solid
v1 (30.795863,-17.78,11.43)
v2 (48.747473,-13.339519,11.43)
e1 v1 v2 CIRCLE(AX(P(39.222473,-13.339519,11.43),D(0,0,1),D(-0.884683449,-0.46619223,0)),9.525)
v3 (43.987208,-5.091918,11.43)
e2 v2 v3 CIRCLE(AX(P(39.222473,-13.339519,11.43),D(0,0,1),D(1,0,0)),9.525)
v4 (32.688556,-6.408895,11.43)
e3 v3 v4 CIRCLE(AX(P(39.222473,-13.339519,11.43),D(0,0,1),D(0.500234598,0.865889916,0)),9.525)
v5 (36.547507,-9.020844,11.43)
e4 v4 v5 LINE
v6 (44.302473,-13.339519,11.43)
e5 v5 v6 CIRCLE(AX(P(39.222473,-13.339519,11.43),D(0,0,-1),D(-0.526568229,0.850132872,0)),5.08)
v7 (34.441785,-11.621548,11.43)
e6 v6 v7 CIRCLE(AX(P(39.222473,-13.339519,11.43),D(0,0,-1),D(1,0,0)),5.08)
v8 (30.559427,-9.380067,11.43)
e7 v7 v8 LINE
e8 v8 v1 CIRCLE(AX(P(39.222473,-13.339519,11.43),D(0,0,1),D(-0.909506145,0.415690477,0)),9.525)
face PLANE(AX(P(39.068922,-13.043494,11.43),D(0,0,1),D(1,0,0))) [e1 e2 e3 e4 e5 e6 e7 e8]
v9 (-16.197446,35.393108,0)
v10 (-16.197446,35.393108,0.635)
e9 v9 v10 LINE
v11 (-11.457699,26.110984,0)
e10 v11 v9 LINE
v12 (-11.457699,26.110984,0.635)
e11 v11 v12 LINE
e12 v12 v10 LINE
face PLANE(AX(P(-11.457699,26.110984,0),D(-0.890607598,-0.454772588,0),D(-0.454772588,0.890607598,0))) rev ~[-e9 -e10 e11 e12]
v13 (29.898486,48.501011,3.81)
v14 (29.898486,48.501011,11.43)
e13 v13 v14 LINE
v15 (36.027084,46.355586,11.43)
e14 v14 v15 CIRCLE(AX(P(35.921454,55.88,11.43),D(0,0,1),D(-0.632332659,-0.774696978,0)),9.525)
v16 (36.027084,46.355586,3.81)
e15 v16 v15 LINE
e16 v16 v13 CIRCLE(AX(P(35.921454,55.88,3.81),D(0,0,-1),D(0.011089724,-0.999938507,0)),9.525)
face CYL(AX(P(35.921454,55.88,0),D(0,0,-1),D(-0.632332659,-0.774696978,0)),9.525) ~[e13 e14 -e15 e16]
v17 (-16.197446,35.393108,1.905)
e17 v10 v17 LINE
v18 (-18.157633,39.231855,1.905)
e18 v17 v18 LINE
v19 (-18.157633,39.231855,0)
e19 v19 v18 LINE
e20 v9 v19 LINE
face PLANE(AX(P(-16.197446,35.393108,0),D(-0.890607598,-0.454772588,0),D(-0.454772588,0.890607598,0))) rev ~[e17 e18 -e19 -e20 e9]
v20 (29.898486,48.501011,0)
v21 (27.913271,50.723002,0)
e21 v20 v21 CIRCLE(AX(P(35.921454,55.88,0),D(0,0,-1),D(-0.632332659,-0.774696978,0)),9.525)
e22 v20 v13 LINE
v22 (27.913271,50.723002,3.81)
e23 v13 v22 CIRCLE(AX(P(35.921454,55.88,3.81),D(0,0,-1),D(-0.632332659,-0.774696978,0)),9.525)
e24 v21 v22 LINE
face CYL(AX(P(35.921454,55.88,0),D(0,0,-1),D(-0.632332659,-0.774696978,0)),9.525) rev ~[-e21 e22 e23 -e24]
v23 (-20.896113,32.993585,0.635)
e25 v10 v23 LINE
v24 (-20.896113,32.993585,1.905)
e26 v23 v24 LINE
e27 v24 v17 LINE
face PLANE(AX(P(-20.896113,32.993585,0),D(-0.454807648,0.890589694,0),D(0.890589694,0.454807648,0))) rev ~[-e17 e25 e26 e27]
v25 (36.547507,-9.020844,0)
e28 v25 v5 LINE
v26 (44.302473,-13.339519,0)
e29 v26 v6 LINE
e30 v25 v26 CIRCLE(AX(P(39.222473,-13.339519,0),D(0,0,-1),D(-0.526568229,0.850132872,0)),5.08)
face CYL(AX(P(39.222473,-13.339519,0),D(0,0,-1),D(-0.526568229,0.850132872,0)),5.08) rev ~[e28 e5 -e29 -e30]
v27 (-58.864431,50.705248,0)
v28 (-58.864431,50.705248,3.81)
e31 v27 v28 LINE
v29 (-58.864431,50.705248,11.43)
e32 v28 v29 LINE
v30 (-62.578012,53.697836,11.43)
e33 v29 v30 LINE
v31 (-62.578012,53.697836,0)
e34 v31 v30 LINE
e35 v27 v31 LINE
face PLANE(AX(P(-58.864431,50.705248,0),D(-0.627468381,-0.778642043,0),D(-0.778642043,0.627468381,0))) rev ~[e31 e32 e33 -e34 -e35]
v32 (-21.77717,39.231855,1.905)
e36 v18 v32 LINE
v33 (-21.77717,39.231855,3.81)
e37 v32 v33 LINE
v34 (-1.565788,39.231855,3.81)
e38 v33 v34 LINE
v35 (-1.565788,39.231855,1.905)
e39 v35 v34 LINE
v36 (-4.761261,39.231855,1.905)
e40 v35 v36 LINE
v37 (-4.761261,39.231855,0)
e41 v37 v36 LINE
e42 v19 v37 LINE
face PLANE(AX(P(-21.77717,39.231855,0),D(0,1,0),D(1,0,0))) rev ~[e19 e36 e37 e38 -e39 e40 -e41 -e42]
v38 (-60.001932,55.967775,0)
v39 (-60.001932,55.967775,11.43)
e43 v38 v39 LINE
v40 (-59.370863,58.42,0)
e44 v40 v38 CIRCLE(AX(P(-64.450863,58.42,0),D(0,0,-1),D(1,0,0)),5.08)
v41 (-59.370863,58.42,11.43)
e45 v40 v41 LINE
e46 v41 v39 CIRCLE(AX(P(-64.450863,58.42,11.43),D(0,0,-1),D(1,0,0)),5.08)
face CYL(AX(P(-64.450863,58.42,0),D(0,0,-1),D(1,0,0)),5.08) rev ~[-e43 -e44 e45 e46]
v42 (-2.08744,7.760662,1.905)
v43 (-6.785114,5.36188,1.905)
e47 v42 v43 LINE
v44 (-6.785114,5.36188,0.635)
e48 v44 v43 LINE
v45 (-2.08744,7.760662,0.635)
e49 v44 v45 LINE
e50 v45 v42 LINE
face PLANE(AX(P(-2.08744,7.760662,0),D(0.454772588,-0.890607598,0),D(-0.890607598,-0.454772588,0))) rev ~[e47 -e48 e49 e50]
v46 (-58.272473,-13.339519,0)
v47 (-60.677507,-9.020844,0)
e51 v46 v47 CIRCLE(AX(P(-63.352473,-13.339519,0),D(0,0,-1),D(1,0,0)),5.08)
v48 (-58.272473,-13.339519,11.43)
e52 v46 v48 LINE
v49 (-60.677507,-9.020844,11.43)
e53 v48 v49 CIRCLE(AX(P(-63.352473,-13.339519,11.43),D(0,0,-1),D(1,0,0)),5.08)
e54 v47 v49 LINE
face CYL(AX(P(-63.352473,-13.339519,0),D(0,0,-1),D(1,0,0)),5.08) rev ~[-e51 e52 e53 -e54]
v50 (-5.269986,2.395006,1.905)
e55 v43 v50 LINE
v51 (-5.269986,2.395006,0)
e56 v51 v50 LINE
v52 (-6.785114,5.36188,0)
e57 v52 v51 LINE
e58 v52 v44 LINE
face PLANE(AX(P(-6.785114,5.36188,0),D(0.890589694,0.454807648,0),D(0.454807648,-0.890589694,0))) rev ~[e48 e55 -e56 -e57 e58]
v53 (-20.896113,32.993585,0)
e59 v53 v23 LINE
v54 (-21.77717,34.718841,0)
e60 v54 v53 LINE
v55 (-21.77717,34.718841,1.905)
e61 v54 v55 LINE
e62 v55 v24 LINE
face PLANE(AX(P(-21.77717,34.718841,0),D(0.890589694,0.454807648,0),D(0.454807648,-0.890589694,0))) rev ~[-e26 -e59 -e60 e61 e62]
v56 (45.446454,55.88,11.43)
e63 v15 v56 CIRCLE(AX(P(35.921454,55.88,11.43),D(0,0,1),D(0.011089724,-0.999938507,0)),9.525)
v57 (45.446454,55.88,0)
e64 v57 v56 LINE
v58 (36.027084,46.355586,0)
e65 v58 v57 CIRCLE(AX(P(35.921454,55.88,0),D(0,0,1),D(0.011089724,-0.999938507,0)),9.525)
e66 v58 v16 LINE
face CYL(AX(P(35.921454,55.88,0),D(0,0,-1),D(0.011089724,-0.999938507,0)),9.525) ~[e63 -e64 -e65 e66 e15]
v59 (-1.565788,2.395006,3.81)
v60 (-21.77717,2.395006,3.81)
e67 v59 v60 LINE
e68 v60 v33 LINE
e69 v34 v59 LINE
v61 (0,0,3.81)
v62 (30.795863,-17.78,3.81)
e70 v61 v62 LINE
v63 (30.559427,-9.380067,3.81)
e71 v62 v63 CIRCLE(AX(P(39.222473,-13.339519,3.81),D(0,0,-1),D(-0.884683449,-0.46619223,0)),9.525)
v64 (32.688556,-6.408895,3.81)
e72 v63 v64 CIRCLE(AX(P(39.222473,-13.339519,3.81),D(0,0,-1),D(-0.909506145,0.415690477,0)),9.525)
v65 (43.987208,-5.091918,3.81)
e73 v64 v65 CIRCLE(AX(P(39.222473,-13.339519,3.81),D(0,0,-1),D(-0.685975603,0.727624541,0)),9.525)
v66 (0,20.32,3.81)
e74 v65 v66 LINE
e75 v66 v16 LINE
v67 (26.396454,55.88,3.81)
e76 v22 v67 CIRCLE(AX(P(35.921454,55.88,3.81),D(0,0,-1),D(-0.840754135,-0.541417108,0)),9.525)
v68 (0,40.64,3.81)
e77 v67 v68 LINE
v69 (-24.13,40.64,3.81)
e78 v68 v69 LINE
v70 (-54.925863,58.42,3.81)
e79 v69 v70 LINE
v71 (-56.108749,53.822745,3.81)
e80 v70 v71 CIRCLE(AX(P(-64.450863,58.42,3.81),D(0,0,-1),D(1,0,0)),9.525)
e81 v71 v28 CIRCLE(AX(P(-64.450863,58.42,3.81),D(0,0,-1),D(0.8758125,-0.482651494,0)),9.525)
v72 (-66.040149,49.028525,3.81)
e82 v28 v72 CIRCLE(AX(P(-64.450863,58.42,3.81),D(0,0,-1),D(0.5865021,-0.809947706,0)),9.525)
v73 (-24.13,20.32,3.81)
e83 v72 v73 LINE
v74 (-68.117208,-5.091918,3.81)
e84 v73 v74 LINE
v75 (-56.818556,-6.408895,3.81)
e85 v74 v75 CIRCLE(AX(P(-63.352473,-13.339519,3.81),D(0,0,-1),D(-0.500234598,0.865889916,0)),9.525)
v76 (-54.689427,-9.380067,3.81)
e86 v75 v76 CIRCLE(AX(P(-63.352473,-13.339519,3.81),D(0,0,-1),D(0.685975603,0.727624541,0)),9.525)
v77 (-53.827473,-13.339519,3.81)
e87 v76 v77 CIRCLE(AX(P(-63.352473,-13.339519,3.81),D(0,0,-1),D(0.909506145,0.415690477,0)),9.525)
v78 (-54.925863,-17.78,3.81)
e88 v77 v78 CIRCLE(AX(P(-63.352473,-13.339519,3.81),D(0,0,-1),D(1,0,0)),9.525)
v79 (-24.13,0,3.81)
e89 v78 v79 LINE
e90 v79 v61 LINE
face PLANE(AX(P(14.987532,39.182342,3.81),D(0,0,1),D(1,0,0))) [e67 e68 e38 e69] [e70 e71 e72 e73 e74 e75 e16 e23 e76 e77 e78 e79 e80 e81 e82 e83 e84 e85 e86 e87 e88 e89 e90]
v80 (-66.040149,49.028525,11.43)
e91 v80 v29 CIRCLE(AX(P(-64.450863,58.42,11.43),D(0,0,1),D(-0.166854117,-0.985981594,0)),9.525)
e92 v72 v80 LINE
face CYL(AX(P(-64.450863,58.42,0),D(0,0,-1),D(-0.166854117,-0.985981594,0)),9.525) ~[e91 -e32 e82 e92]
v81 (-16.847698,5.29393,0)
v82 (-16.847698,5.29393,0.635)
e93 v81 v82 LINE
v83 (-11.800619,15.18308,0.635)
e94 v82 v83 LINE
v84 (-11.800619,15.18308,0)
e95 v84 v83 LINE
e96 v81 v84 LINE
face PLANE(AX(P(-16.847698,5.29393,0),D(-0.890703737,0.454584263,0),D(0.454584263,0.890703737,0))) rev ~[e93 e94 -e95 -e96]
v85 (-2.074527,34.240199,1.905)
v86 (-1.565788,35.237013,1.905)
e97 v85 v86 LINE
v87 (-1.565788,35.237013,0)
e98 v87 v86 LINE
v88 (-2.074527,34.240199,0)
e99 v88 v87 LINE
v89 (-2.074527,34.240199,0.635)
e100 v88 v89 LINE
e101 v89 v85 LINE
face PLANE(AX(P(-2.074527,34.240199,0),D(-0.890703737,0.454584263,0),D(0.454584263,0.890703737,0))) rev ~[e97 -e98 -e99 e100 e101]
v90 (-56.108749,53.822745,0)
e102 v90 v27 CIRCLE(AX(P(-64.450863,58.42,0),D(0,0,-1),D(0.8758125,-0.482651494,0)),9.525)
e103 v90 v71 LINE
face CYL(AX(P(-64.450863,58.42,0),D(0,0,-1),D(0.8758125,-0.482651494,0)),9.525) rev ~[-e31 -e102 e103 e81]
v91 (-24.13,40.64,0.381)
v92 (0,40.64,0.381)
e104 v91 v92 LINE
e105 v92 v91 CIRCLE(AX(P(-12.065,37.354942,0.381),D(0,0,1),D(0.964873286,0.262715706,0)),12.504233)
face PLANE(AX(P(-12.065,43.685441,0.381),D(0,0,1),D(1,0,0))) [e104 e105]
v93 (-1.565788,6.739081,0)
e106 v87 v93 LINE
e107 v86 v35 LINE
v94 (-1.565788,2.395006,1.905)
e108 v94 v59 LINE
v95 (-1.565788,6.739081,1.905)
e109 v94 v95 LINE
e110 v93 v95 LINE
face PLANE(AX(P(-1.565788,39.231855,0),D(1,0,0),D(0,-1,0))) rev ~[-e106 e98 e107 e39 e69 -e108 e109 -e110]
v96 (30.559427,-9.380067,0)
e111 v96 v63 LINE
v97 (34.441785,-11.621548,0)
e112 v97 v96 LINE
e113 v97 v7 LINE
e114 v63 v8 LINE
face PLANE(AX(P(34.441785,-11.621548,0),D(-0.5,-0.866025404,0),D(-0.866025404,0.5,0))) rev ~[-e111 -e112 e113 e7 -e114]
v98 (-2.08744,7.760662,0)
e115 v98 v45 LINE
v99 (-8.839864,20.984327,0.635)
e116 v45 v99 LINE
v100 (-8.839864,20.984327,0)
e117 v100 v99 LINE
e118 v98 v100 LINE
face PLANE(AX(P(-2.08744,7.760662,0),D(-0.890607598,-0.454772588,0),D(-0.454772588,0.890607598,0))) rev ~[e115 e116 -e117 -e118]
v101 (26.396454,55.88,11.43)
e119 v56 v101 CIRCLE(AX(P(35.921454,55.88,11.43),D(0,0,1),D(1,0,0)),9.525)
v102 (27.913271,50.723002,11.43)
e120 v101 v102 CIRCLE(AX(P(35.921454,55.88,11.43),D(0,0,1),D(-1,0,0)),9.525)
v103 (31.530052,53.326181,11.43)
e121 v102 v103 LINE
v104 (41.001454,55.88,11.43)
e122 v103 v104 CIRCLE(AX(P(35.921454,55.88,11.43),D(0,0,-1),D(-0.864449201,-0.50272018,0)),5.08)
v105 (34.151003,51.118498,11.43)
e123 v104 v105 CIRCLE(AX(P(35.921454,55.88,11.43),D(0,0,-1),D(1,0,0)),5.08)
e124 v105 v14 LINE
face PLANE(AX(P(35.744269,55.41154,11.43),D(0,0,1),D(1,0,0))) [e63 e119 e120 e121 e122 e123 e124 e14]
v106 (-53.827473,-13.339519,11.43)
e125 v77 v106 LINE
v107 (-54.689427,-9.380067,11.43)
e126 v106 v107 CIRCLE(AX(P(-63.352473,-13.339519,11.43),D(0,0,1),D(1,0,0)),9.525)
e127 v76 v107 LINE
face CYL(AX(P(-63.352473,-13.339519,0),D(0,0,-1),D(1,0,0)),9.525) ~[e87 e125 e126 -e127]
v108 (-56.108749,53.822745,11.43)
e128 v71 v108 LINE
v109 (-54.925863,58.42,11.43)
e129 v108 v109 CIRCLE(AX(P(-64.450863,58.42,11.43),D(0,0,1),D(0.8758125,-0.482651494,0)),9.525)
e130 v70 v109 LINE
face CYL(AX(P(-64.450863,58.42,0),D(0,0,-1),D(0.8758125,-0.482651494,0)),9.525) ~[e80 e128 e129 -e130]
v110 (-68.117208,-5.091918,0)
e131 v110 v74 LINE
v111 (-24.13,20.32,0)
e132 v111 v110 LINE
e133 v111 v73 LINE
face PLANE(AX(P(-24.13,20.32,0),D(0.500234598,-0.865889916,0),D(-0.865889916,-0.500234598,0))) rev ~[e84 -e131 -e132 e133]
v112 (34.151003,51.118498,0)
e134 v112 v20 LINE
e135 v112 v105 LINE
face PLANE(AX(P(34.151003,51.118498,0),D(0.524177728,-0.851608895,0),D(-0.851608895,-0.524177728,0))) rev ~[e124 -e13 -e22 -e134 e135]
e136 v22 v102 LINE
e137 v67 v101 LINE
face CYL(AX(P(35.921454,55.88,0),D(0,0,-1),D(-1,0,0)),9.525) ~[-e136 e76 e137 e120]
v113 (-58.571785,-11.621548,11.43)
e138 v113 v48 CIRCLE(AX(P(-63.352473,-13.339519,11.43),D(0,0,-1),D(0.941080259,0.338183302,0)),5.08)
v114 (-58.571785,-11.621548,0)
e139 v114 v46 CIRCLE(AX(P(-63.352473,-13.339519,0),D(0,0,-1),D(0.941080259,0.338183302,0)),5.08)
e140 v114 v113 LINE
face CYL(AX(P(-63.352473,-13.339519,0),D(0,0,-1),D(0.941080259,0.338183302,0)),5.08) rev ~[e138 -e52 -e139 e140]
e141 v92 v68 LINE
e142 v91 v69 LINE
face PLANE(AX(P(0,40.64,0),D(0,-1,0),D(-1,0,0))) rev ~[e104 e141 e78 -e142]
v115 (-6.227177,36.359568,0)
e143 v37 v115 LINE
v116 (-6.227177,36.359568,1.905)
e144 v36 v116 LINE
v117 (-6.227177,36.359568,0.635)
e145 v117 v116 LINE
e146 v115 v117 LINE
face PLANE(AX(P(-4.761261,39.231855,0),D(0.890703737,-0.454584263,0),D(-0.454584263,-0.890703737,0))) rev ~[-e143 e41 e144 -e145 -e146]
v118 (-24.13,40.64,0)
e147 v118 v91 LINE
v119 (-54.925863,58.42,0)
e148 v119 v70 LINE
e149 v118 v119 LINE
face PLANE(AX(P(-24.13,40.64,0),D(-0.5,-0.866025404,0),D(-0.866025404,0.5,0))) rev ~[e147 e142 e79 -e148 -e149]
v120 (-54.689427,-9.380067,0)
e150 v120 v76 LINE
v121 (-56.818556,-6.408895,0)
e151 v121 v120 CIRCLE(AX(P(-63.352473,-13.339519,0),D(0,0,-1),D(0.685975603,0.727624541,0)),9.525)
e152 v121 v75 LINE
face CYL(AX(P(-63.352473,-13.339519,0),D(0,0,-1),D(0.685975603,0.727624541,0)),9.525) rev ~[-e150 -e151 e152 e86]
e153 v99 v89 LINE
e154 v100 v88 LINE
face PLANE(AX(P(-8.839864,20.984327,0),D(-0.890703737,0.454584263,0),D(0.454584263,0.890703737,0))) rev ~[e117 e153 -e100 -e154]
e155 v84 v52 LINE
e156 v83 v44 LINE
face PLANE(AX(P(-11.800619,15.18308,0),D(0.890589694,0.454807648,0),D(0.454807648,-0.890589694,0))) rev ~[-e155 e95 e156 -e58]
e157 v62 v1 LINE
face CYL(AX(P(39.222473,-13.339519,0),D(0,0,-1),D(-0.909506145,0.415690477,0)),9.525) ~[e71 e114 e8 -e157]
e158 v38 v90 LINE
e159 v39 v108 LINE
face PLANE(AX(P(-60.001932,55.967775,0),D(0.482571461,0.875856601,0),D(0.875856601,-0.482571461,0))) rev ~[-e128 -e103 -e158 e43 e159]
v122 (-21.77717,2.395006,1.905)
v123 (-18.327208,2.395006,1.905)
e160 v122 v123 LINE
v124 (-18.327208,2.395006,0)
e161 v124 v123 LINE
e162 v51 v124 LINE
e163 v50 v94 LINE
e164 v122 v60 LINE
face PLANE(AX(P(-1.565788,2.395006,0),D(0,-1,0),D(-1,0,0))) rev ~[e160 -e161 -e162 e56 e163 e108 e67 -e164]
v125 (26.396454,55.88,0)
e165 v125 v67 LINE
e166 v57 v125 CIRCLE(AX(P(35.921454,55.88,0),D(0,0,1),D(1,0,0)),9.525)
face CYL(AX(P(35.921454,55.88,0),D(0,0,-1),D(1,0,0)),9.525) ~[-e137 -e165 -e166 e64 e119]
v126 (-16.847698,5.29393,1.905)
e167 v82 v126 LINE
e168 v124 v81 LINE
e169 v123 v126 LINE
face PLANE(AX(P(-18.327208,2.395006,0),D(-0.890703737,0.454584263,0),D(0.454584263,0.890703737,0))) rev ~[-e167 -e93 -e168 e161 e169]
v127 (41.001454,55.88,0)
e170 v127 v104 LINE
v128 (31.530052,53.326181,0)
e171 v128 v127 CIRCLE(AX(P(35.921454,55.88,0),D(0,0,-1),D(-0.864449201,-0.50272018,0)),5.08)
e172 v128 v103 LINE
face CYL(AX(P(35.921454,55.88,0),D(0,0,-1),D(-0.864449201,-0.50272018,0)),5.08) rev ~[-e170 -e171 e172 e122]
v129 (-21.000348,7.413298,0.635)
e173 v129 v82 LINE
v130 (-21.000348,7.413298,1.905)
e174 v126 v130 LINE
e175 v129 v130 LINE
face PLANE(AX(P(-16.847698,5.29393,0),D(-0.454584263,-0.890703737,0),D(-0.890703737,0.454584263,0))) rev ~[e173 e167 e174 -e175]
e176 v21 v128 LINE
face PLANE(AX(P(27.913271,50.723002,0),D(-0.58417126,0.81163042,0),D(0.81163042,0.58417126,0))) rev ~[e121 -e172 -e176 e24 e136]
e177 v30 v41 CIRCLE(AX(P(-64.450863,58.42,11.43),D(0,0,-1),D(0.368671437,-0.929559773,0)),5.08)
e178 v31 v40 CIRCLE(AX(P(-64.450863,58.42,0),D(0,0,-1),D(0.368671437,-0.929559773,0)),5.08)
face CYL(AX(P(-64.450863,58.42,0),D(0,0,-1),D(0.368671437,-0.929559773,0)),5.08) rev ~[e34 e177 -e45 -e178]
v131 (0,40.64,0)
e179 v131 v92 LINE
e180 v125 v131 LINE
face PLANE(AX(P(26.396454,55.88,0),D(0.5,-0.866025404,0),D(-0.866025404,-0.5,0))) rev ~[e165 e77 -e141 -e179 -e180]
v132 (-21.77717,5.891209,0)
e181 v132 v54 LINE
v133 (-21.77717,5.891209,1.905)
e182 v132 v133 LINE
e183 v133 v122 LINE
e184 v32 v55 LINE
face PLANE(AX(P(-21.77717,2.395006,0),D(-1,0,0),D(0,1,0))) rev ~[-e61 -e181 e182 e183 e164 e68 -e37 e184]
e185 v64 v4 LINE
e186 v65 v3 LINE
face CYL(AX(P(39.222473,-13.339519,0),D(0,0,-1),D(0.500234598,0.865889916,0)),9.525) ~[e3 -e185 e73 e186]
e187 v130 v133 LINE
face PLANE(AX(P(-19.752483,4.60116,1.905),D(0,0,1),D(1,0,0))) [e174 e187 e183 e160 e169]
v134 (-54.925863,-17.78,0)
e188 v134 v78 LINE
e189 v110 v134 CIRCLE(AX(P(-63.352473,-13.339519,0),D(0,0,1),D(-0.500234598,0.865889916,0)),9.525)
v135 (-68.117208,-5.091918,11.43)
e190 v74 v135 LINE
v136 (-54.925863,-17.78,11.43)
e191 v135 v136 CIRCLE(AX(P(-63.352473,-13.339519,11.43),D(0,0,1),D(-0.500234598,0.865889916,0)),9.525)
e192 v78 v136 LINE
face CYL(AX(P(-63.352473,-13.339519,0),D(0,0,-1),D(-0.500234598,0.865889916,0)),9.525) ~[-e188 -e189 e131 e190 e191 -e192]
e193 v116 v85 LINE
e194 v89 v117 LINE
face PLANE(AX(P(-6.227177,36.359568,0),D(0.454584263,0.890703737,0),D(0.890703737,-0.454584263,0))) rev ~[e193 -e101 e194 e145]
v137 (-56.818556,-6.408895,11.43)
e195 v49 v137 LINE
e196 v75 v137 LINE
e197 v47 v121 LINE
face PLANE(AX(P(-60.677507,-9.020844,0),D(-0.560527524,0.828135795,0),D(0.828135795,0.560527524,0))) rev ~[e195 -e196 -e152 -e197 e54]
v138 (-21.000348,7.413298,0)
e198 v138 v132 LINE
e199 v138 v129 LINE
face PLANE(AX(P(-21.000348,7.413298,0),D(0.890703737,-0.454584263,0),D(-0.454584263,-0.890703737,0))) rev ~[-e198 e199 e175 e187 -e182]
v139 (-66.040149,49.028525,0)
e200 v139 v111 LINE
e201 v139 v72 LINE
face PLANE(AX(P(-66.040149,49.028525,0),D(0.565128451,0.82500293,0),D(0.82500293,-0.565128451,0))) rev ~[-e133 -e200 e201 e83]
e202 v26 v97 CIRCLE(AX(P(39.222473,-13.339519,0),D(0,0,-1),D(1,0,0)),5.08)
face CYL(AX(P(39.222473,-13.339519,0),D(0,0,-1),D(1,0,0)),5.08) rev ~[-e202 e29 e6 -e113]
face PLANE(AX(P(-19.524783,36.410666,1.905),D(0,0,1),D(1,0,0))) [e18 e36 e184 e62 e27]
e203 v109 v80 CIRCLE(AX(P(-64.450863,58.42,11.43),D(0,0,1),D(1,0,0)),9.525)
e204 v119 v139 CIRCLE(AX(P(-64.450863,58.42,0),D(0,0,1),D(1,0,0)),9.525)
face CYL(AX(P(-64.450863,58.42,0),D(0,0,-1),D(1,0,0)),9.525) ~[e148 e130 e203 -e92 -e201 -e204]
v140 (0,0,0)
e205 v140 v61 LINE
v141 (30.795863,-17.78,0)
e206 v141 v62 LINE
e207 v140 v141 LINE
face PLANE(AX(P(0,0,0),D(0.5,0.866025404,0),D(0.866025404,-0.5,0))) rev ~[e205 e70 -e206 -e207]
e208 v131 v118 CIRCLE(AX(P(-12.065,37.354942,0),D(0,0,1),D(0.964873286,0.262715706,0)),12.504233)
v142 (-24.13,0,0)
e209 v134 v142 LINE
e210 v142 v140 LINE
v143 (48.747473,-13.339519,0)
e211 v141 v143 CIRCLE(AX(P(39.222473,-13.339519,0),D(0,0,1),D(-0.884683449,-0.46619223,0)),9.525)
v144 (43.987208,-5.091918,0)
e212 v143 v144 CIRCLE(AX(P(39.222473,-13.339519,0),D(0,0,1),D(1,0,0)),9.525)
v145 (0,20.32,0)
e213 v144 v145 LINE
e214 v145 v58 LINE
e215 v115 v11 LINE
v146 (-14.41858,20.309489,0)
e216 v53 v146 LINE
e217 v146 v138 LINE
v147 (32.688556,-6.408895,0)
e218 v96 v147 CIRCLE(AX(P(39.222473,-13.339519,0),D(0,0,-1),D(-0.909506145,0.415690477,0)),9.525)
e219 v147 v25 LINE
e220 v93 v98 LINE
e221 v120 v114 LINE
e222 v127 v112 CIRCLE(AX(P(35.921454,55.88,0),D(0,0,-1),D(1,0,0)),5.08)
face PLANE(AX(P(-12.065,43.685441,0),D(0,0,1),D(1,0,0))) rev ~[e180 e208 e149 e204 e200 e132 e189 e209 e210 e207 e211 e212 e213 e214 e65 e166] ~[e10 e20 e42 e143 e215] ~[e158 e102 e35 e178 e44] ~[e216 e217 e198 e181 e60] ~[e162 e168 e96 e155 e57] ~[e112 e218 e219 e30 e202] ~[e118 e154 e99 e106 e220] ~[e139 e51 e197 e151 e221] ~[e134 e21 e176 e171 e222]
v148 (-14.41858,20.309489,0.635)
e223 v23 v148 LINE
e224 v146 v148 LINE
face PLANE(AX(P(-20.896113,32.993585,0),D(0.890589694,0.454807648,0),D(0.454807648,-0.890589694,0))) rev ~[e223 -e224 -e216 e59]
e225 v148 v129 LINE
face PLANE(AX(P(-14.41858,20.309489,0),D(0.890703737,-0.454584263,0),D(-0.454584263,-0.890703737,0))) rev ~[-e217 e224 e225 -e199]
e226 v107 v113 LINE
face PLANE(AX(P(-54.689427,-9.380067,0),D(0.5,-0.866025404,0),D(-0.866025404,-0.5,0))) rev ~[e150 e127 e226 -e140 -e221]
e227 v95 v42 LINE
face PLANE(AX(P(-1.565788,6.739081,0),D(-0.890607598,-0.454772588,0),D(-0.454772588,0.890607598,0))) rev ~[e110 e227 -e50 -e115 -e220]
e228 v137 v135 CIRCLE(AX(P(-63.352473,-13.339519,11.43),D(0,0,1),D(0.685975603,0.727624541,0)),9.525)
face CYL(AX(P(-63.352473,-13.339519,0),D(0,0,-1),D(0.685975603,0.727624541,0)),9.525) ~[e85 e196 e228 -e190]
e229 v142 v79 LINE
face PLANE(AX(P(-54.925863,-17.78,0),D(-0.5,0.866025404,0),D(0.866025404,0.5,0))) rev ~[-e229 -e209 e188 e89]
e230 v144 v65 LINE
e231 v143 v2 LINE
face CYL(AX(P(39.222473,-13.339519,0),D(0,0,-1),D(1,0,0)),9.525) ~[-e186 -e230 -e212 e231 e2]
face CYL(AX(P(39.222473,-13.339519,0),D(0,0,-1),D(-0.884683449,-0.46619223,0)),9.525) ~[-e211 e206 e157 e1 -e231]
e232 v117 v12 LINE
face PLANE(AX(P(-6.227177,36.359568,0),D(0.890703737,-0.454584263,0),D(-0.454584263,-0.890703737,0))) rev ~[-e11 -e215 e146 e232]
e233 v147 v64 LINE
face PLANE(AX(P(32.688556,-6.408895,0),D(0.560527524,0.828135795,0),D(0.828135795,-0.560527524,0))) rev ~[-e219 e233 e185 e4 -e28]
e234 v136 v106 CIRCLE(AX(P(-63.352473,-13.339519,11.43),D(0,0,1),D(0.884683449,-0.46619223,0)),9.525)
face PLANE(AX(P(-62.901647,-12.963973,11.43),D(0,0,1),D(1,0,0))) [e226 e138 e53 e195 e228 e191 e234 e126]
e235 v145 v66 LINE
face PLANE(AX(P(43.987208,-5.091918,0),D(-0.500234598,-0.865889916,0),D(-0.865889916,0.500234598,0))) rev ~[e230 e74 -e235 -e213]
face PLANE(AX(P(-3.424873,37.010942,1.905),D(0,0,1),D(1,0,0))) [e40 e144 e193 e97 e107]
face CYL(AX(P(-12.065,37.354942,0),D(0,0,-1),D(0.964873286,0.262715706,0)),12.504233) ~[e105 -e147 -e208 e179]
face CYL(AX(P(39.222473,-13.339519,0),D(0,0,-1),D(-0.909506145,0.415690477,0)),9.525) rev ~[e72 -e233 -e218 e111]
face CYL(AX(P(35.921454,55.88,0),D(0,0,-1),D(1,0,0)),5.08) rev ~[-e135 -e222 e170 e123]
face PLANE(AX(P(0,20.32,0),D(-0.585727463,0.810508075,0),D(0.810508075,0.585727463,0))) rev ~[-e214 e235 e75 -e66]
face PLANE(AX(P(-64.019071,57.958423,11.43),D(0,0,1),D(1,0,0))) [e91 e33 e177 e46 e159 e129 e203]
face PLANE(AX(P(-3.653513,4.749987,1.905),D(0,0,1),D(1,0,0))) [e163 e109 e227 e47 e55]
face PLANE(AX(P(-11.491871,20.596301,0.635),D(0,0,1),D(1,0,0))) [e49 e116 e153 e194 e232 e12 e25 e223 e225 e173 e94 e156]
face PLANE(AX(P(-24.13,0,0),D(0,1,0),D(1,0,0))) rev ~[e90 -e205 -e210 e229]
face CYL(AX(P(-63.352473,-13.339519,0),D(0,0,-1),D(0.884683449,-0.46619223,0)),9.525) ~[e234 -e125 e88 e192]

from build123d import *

# Parameters (mm, degrees)
F1_DEPTH = 3.81
F2_DEPTH = 11.43
F3_DEPTH = 1.905
F4_DEPTH = 0.635
F5_DEPTH = 0.381


with BuildPart() as f1:
    # F0 (on Top) → F1 (new body)
    with BuildSketch(Plane.XY):
        with BuildLine():
            Line((0, 40.64), (0, 20.32))
            Line((0, 20.32), (36.0270839263, 46.3555857197))
            ThreePointArc((36.0270839263, 46.3555857197), (32.7743226286, 46.8899395332), (29.8984857282, 48.5010112824))
            ThreePointArc((29.8984857282, 48.5010112824), (28.8184538619, 49.5338980727), (27.9132711745, 50.7230020447))
            ThreePointArc((27.9132711745, 50.7230020447), (26.7835232138, 53.1922797151), (26.3964543073, 55.88))
            Line((26.3964543073, 55.88), (0, 40.64))
        make_face()
        with BuildLine():
            Line((0, 20.32), (0, 0))
            Line((0, 0), (30.7958633586, -17.78))
            ThreePointArc((30.7958633586, -17.78), (29.7012441826, -13.6075167511), (30.5594271825, -9.3800672195))
            ThreePointArc((30.5594271825, -9.3800672195), (31.4801291394, -7.7913902048), (32.6885555919, -6.4088952646))
            ThreePointArc((32.6885555919, -6.4088952646), (38.1196995449, -3.8785721663), (43.9872077535, -5.0919175595))
            Line((43.9872077535, -5.0919175595), (0, 20.32))
        make_face()
        with BuildLine():
            Line((-54.9258633586, -17.78), (-24.13, 0))
            Line((-24.13, 0), (-24.13, 20.32))
            Line((-24.13, 20.32), (-68.1172077535, -5.0919175595))
            ThreePointArc((-68.1172077535, -5.0919175595), (-62.2496995449, -3.8785721663), (-56.8185555919, -6.4088952646))
            ThreePointArc((-56.8185555919, -6.4088952646), (-55.6101291394, -7.7913902048), (-54.6894271825, -9.3800672195))
            ThreePointArc((-54.6894271825, -9.3800672195), (-54.0454560084, -11.3134252867), (-53.8274732111, -13.3395190133))
            ThreePointArc((-53.8274732111, -13.3395190133), (-54.1061473504, -15.6266751246), (-54.9258633586, -17.78))
        make_face()
        with BuildLine():
            Line((-66.0401488201, 49.028525317), (-24.13, 20.32))
            Line((-24.13, 20.32), (-24.13, 40.64))
            Line((-24.13, 40.64), (-54.9258633586, 58.42))
            ThreePointArc((-54.9258633586, 58.42), (-55.2263237646, 56.0465016792), (-56.1087492964, 53.8227445173))
            ThreePointArc((-56.1087492964, 53.8227445173), (-57.3142816625, 52.1116859071), (-58.8644308605, 50.7052480957))
            ThreePointArc((-58.8644308605, 50.7052480957), (-62.2835733625, 49.1448461429), (-66.0401488201, 49.028525317))
        make_face()
        Polygon((-24.13, 0), (0, 0), (0, 20.32), (0, 40.64), (-24.13, 40.64), (-24.13, 20.32), align=None)
        Polygon((-18.3272082359, 2.3950056639), (-21.7771697789, 2.3950056639), (-21.7771697789, 5.8912090026), (-21.7771697789, 34.7188413143), (-21.7771697789, 39.2318554223), (-18.1576330215, 39.2318554223), (-4.7612613998, 39.2318554223), (-1.5657880576, 39.2318554223), (-1.5657880576, 35.2370127553), (-1.5657880576, 6.7390808836), (-1.5657880576, 2.3950056639), (-5.2699861117, 2.3950056639), align=None, mode=Mode.SUBTRACT)
    extrude(amount=F1_DEPTH)

    # F0 (on Top) → F2 (join)
    with BuildSketch(Plane.XY):
        with BuildLine():
            ThreePointArc((30.5594271825, -9.3800672195), (29.7012441826, -13.6075167511), (30.7958633586, -17.78))
            ThreePointArc((30.7958633586, -17.78), (41.5096293224, -22.585844874), (48.7474732111, -13.3395190133))
            ThreePointArc((48.7474732111, -13.3395190133), (47.4720102137, -8.5781364156), (43.9872077535, -5.0919175595))
            ThreePointArc((43.9872077535, -5.0919175595), (38.1196995449, -3.8785721663), (32.6885555919, -6.4088952646))
            Line((32.6885555919, -6.4088952646), (36.5475066082, -9.0208440228))
            ThreePointArc((36.5475066082, -9.0208440228), (41.6940688149, -8.9013194717), (44.3024732111, -13.3395190133))
            ThreePointArc((44.3024732111, -13.3395190133), (38.3505482132, -18.3441315655), (34.4417854953, -11.6215478365))
            Line((34.4417854953, -11.6215478365), (30.5594271825, -9.3800672195))
        make_face()
        with BuildLine():
            ThreePointArc((-68.1172077535, -5.0919175595), (-69.9554416118, -20.2043885167), (-54.9258633586, -17.78))
            ThreePointArc((-54.9258633586, -17.78), (-54.1061473504, -15.6266751246), (-53.8274732111, -13.3395190133))
            ThreePointArc((-53.8274732111, -13.3395190133), (-54.0454560084, -11.3134252867), (-54.6894271825, -9.3800672195))
            Line((-54.6894271825, -9.3800672195), (-58.5717854953, -11.6215478365))
            ThreePointArc((-58.5717854953, -11.6215478365), (-58.3478606589, -12.4675940154), (-58.2724732111, -13.3395190133))
            ThreePointArc((-58.2724732111, -13.3395190133), (-67.7906727527, -15.8111146171), (-60.6775066082, -9.0208440228))
            Line((-60.6775066082, -9.0208440228), (-56.8185555919, -6.4088952646))
            ThreePointArc((-56.8185555919, -6.4088952646), (-62.2496995449, -3.8785721663), (-68.1172077535, -5.0919175595))
        make_face()
        with BuildLine():
            ThreePointArc((-54.9258633586, 58.42), (-70.5985328755, 65.6954233217), (-66.0401488201, 49.028525317))
            ThreePointArc((-66.0401488201, 49.028525317), (-62.2835733625, 49.1448461429), (-58.8644308605, 50.7052480957))
            Line((-58.8644308605, 50.7052480957), (-62.5780124602, 53.6978363526))
            ThreePointArc((-62.5780124602, 53.6978363526), (-68.6532723441, 61.2741476343), (-59.3708633586, 58.42))
            ThreePointArc((-59.3708633586, 58.42), (-59.5311595199, 57.153937545), (-60.0019319176, 55.9677746772))
            Line((-60.0019319176, 55.9677746772), (-56.1087492964, 53.8227445173))
            ThreePointArc((-56.1087492964, 53.8227445173), (-55.2263237646, 56.0465016792), (-54.9258633586, 58.42))
        make_face()
        with BuildLine():
            ThreePointArc((29.8984857282, 48.5010112824), (32.7743226286, 46.8899395332), (36.0270839263, 46.3555857197))
            ThreePointArc((36.0270839263, 46.3555857197), (42.6938891398, 49.1822577357), (45.4464543073, 55.88))
            ThreePointArc((45.4464543073, 55.88), (35.9214543073, 65.405), (26.3964543073, 55.88))
            ThreePointArc((26.3964543073, 55.88), (26.7835232138, 53.1922797151), (27.9132711745, 50.7230020447))
            Line((27.9132711745, 50.7230020447), (31.5300523665, 53.3261814877))
            ThreePointArc((31.5300523665, 53.3261814877), (34.598941899, 60.7848303671), (41.0014543073, 55.88))
            ThreePointArc((41.0014543073, 55.88), (38.820808345, 51.708651757), (34.1510030615, 51.1184978855))
            Line((34.1510030615, 51.1184978855), (29.8984857282, 48.5010112824))
        make_face()
    extrude(amount=F2_DEPTH)

    # F0 (on Top) → F3 (join)
    with BuildSketch(Plane.XY):
        Polygon((-21.7771697789, 5.8912090026), (-21.7771697789, 2.3950056639), (-18.3272082359, 2.3950056639), (-16.8476979102, 5.2939299848), (-21.0003481494, 7.4132984911), align=None)
        Polygon((-6.7851137214, 5.3618797736), (-5.2699861117, 2.3950056639), (-1.5657880576, 2.3950056639), (-1.5657880576, 6.7390808836), (-2.0874397167, 7.760661653), align=None)
        Polygon((-21.7771697789, 39.2318554223), (-21.7771697789, 34.7188413143), (-20.8961134896, 32.993585252), (-16.1974461672, 35.3931075525), (-18.1576330215, 39.2318554223), align=None)
        Polygon((-2.074527, 34.2401993722), (-1.5657880576, 35.2370127553), (-1.5657880576, 39.2318554223), (-4.7612613998, 39.2318554223), (-6.2271772392, 36.3595678785), align=None)
    extrude(amount=F3_DEPTH)

    # F0 (on Top) → F4 (join)
    with BuildSketch(Plane.XY):
        Polygon((-21.0003481494, 7.4132984911), (-16.8476979102, 5.2939299848), (-11.8006188508, 15.1830804564), (-6.7851137214, 5.3618797736), (-2.0874397167, 7.760661653), (-8.8398640982, 20.9843268631), (-2.074527, 34.2401993722), (-6.2271772392, 36.3595678785), (-11.4576985252, 26.110984206), (-16.1974461672, 35.3931075525), (-20.8961134896, 32.993585252), (-14.41858046, 20.309488601), align=None)
    extrude(amount=F4_DEPTH)

    # F0 (on Top) → F5 (join)
    with BuildSketch(Plane.XY):
        with BuildLine():
            Line((-24.13, 40.64), (0, 40.64))
            ThreePointArc((0, 40.64), (-12.065, 49.8591743067), (-24.13, 40.64))
        make_face()
    extrude(amount=F5_DEPTH)


solid = f1.part
